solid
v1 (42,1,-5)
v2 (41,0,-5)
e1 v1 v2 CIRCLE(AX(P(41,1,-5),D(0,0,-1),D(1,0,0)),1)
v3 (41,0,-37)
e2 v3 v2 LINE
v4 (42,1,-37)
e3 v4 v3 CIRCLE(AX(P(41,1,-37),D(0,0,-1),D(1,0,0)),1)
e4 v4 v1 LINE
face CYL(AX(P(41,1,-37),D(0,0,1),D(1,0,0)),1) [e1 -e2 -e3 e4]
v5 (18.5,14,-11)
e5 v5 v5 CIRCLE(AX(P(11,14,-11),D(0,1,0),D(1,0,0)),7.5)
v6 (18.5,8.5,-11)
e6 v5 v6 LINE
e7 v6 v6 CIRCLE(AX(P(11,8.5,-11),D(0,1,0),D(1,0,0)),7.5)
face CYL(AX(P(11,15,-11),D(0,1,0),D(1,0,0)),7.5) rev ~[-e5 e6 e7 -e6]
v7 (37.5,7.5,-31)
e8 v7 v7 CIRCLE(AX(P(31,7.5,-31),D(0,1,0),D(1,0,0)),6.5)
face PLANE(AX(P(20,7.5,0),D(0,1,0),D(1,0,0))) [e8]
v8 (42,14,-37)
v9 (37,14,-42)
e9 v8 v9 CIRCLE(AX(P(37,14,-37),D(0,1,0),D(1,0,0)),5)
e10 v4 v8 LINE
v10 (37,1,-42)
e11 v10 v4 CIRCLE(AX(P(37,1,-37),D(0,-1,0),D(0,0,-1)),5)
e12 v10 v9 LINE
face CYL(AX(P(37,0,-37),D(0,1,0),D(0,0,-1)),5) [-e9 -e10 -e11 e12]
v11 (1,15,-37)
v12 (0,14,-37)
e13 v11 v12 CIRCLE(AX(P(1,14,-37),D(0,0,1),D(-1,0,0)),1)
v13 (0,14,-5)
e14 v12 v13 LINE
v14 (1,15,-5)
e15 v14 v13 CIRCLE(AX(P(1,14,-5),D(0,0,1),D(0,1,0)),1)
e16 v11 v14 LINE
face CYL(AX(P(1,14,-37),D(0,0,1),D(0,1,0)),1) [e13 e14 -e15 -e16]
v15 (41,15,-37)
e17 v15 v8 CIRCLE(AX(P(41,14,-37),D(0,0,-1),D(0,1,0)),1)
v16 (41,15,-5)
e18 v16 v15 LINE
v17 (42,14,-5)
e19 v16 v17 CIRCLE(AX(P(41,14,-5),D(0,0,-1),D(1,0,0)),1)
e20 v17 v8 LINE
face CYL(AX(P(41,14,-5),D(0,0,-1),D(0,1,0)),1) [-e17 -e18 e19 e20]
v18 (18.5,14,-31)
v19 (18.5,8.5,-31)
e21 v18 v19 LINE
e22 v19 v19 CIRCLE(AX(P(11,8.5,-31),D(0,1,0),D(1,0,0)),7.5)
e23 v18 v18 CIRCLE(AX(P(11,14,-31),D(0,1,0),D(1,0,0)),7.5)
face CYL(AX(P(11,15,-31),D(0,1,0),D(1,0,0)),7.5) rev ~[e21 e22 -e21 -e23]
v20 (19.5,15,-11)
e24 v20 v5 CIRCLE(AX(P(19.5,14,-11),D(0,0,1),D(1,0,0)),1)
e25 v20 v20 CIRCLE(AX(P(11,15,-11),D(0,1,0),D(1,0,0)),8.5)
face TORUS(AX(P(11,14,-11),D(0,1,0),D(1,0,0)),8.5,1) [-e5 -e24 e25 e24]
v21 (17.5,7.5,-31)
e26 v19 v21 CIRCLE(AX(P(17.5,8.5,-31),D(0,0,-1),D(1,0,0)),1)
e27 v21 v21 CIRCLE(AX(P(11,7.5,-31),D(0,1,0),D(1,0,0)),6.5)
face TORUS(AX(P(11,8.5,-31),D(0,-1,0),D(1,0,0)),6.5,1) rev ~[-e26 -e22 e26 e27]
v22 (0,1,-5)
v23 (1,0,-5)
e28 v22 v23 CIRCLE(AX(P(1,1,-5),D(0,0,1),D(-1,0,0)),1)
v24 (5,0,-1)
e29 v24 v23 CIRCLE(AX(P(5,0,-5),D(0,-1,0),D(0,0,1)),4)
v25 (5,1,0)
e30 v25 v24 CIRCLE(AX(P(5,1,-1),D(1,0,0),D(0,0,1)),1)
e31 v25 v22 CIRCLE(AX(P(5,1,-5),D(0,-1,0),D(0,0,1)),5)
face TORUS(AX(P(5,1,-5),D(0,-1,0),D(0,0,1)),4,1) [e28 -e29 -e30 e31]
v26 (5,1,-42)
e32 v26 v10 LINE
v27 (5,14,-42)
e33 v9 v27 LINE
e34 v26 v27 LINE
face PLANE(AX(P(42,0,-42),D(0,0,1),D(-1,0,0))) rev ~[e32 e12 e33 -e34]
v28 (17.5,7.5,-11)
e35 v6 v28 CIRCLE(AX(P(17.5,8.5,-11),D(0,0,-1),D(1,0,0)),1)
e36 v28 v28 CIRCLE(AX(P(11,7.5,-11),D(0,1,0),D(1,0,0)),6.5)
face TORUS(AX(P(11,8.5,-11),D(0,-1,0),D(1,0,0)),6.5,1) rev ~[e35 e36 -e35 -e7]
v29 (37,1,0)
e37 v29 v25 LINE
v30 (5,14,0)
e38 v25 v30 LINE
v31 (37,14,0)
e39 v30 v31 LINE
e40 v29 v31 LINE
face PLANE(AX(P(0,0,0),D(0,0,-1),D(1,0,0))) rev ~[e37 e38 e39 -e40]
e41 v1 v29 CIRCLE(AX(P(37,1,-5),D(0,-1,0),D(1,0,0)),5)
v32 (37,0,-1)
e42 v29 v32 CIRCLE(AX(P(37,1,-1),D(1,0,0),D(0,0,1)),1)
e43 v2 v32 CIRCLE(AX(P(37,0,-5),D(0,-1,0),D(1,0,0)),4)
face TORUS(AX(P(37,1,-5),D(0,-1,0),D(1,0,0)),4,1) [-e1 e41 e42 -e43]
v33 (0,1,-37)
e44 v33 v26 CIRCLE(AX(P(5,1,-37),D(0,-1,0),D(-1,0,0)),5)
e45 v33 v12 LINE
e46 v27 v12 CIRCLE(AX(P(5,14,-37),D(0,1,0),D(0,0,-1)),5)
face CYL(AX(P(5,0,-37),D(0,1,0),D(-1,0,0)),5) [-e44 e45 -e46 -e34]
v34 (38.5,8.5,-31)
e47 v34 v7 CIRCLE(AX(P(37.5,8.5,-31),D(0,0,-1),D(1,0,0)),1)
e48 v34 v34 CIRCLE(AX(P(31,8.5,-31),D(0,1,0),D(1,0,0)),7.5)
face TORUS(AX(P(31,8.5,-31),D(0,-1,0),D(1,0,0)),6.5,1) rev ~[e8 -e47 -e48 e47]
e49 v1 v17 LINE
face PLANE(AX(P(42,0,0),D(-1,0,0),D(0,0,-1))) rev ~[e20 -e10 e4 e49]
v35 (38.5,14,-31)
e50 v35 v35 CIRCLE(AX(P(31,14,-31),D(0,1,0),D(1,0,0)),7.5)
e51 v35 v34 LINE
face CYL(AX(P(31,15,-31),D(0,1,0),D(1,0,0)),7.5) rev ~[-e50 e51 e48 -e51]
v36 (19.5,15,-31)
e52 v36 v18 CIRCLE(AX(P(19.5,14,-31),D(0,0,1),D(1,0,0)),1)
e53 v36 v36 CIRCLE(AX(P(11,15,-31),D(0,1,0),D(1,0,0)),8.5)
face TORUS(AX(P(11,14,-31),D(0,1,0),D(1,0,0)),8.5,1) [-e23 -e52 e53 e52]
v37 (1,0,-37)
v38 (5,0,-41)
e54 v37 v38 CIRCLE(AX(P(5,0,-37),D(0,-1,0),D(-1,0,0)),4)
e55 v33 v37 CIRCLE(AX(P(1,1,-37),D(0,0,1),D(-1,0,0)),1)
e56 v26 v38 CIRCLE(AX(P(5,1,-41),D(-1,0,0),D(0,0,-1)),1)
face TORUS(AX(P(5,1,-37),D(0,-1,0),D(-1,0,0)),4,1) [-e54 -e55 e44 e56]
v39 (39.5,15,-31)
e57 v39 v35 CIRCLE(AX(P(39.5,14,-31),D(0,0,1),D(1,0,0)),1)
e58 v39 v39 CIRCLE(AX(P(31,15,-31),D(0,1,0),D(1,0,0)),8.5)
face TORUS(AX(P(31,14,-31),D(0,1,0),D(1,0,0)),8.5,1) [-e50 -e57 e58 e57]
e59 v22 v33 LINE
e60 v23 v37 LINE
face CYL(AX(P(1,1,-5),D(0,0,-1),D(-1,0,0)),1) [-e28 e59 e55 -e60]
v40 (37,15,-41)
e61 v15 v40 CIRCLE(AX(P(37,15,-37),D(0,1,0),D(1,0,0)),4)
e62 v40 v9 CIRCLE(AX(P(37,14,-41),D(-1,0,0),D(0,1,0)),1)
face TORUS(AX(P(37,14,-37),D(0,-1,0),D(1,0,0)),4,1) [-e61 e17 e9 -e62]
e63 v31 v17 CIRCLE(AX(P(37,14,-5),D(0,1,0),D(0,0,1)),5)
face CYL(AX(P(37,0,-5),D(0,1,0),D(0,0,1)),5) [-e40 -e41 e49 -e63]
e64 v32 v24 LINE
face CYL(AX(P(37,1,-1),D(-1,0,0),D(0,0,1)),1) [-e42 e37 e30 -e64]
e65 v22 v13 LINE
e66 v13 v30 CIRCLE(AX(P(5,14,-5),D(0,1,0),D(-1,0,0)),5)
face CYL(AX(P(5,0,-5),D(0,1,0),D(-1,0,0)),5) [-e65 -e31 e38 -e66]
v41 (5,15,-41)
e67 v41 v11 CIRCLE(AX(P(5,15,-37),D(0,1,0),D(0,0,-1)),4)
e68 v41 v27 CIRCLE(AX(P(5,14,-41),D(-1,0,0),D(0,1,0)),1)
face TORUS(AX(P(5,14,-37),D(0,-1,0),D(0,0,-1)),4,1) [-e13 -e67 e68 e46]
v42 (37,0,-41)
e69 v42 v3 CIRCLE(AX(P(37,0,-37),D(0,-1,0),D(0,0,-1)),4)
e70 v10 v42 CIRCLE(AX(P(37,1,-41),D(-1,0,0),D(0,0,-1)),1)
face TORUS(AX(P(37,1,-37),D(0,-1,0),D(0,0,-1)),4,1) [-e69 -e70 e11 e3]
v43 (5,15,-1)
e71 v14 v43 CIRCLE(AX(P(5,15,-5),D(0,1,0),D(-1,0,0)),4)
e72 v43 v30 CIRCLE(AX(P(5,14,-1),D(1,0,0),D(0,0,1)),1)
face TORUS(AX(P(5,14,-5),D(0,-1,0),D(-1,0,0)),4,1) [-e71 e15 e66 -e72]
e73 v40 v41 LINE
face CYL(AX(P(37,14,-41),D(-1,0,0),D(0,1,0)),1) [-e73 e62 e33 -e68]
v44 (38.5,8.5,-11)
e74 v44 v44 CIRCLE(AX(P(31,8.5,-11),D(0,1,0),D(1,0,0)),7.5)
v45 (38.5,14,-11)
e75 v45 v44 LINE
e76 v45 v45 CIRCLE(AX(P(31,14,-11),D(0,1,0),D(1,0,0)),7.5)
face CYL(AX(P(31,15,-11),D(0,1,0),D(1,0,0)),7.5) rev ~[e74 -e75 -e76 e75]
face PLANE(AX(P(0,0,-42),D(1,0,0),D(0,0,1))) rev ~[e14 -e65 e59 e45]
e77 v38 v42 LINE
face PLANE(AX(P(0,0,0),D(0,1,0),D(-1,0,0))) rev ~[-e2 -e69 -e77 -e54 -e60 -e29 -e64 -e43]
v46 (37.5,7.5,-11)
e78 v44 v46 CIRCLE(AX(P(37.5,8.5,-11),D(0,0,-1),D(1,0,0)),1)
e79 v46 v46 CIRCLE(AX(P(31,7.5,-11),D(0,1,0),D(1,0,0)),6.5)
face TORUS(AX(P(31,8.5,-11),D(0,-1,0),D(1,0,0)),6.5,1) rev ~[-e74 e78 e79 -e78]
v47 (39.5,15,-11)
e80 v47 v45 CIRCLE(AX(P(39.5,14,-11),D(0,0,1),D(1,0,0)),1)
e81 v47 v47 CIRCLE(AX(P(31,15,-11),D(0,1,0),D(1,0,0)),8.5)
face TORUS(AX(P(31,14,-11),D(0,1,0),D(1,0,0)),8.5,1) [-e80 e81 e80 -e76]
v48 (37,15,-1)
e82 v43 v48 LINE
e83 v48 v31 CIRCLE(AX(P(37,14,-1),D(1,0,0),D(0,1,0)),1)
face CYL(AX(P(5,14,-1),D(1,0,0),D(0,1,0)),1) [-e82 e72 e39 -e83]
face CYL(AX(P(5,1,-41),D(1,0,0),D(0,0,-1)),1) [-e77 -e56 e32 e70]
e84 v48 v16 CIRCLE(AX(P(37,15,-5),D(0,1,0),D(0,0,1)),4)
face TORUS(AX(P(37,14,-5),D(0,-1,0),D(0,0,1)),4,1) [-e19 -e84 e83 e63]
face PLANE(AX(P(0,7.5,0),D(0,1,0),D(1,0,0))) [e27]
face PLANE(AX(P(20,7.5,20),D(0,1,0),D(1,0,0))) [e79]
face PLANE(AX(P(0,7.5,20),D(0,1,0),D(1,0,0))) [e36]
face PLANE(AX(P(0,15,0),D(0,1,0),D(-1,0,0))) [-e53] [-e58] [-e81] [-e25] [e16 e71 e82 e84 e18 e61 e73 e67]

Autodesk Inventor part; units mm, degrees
sketch "Sketch1" plane through (0, 0, 0) normal (0, 1, 0) x (-1, 0, 0)
  line L0 (0, 0) -> (-42, 0)
  line L1 (-42, 0) -> (-42, -42)
  line L2 (-42, -42) -> (0, -42)
  line L3 (0, -42) -> (0, 0)
  dimension "d0" = 42
  dimension "d1" = 42
extrude "Extrusion1" add sketch "Sketch1" along normal blind 15
sketch "Sketch2" plane through (0, 15, 0) normal (0, 1, 0) x (1, 0, 0)
  line L0 (42, 42) -> (0, 42) projected
  line L1 (0, 42) -> (0, 0) projected
  line L2 (42, 0) -> (42, 42) projected
  line L3 (0, 0) -> (42, 0) projected
  circle A0 centre (11, 31) radius 7.5
  dimension "d4" = 15
  dimension "d5" = 11
  dimension "d6" = 11
extrude "Extrusion2" cut sketch "Sketch2" against normal blind 7.5 contours A0
fillet "Fillet1" radius 1 2 edges at (3.5, 7.5, -31) (3.5, 15, -31)
pattern_linear "Rectangular Pattern2" count 2 spacing 20 along (1, 0, 0) of "Extrusion2", "Fillet1"
pattern_linear "Rectangular Pattern3" count 2 spacing 20 along (0, 0, 1) of "Extrusion2", "Fillet1", "Rectangular Pattern2"
fillet "Fillet2" radius 5 4 edges at (0, 7.5, 0) (42, 7.5, 0) (0, 7.5, -42) (42, 7.5, -42)
fillet "Fillet3" radius 1 16 edges at (21, 15, -42) (1.4645, 15, -40.5355) (0, 15, -21) (1.4645, 15, -1.4645) (21, 15, 0) (40.5355, 15, -1.4645) (42, 15, -21) (40.5355, 15, -40.5355) (1.4645, 0, -40.5355) (0, 0, -21) (1.4645, 0, -1.4645) (21, 0, 0) (40.5355, 0, -1.4645) (42, 0, -21) (40.5355, 0, -40.5355) (21, 0, -42)
properties part number "Test_Well2x2"
